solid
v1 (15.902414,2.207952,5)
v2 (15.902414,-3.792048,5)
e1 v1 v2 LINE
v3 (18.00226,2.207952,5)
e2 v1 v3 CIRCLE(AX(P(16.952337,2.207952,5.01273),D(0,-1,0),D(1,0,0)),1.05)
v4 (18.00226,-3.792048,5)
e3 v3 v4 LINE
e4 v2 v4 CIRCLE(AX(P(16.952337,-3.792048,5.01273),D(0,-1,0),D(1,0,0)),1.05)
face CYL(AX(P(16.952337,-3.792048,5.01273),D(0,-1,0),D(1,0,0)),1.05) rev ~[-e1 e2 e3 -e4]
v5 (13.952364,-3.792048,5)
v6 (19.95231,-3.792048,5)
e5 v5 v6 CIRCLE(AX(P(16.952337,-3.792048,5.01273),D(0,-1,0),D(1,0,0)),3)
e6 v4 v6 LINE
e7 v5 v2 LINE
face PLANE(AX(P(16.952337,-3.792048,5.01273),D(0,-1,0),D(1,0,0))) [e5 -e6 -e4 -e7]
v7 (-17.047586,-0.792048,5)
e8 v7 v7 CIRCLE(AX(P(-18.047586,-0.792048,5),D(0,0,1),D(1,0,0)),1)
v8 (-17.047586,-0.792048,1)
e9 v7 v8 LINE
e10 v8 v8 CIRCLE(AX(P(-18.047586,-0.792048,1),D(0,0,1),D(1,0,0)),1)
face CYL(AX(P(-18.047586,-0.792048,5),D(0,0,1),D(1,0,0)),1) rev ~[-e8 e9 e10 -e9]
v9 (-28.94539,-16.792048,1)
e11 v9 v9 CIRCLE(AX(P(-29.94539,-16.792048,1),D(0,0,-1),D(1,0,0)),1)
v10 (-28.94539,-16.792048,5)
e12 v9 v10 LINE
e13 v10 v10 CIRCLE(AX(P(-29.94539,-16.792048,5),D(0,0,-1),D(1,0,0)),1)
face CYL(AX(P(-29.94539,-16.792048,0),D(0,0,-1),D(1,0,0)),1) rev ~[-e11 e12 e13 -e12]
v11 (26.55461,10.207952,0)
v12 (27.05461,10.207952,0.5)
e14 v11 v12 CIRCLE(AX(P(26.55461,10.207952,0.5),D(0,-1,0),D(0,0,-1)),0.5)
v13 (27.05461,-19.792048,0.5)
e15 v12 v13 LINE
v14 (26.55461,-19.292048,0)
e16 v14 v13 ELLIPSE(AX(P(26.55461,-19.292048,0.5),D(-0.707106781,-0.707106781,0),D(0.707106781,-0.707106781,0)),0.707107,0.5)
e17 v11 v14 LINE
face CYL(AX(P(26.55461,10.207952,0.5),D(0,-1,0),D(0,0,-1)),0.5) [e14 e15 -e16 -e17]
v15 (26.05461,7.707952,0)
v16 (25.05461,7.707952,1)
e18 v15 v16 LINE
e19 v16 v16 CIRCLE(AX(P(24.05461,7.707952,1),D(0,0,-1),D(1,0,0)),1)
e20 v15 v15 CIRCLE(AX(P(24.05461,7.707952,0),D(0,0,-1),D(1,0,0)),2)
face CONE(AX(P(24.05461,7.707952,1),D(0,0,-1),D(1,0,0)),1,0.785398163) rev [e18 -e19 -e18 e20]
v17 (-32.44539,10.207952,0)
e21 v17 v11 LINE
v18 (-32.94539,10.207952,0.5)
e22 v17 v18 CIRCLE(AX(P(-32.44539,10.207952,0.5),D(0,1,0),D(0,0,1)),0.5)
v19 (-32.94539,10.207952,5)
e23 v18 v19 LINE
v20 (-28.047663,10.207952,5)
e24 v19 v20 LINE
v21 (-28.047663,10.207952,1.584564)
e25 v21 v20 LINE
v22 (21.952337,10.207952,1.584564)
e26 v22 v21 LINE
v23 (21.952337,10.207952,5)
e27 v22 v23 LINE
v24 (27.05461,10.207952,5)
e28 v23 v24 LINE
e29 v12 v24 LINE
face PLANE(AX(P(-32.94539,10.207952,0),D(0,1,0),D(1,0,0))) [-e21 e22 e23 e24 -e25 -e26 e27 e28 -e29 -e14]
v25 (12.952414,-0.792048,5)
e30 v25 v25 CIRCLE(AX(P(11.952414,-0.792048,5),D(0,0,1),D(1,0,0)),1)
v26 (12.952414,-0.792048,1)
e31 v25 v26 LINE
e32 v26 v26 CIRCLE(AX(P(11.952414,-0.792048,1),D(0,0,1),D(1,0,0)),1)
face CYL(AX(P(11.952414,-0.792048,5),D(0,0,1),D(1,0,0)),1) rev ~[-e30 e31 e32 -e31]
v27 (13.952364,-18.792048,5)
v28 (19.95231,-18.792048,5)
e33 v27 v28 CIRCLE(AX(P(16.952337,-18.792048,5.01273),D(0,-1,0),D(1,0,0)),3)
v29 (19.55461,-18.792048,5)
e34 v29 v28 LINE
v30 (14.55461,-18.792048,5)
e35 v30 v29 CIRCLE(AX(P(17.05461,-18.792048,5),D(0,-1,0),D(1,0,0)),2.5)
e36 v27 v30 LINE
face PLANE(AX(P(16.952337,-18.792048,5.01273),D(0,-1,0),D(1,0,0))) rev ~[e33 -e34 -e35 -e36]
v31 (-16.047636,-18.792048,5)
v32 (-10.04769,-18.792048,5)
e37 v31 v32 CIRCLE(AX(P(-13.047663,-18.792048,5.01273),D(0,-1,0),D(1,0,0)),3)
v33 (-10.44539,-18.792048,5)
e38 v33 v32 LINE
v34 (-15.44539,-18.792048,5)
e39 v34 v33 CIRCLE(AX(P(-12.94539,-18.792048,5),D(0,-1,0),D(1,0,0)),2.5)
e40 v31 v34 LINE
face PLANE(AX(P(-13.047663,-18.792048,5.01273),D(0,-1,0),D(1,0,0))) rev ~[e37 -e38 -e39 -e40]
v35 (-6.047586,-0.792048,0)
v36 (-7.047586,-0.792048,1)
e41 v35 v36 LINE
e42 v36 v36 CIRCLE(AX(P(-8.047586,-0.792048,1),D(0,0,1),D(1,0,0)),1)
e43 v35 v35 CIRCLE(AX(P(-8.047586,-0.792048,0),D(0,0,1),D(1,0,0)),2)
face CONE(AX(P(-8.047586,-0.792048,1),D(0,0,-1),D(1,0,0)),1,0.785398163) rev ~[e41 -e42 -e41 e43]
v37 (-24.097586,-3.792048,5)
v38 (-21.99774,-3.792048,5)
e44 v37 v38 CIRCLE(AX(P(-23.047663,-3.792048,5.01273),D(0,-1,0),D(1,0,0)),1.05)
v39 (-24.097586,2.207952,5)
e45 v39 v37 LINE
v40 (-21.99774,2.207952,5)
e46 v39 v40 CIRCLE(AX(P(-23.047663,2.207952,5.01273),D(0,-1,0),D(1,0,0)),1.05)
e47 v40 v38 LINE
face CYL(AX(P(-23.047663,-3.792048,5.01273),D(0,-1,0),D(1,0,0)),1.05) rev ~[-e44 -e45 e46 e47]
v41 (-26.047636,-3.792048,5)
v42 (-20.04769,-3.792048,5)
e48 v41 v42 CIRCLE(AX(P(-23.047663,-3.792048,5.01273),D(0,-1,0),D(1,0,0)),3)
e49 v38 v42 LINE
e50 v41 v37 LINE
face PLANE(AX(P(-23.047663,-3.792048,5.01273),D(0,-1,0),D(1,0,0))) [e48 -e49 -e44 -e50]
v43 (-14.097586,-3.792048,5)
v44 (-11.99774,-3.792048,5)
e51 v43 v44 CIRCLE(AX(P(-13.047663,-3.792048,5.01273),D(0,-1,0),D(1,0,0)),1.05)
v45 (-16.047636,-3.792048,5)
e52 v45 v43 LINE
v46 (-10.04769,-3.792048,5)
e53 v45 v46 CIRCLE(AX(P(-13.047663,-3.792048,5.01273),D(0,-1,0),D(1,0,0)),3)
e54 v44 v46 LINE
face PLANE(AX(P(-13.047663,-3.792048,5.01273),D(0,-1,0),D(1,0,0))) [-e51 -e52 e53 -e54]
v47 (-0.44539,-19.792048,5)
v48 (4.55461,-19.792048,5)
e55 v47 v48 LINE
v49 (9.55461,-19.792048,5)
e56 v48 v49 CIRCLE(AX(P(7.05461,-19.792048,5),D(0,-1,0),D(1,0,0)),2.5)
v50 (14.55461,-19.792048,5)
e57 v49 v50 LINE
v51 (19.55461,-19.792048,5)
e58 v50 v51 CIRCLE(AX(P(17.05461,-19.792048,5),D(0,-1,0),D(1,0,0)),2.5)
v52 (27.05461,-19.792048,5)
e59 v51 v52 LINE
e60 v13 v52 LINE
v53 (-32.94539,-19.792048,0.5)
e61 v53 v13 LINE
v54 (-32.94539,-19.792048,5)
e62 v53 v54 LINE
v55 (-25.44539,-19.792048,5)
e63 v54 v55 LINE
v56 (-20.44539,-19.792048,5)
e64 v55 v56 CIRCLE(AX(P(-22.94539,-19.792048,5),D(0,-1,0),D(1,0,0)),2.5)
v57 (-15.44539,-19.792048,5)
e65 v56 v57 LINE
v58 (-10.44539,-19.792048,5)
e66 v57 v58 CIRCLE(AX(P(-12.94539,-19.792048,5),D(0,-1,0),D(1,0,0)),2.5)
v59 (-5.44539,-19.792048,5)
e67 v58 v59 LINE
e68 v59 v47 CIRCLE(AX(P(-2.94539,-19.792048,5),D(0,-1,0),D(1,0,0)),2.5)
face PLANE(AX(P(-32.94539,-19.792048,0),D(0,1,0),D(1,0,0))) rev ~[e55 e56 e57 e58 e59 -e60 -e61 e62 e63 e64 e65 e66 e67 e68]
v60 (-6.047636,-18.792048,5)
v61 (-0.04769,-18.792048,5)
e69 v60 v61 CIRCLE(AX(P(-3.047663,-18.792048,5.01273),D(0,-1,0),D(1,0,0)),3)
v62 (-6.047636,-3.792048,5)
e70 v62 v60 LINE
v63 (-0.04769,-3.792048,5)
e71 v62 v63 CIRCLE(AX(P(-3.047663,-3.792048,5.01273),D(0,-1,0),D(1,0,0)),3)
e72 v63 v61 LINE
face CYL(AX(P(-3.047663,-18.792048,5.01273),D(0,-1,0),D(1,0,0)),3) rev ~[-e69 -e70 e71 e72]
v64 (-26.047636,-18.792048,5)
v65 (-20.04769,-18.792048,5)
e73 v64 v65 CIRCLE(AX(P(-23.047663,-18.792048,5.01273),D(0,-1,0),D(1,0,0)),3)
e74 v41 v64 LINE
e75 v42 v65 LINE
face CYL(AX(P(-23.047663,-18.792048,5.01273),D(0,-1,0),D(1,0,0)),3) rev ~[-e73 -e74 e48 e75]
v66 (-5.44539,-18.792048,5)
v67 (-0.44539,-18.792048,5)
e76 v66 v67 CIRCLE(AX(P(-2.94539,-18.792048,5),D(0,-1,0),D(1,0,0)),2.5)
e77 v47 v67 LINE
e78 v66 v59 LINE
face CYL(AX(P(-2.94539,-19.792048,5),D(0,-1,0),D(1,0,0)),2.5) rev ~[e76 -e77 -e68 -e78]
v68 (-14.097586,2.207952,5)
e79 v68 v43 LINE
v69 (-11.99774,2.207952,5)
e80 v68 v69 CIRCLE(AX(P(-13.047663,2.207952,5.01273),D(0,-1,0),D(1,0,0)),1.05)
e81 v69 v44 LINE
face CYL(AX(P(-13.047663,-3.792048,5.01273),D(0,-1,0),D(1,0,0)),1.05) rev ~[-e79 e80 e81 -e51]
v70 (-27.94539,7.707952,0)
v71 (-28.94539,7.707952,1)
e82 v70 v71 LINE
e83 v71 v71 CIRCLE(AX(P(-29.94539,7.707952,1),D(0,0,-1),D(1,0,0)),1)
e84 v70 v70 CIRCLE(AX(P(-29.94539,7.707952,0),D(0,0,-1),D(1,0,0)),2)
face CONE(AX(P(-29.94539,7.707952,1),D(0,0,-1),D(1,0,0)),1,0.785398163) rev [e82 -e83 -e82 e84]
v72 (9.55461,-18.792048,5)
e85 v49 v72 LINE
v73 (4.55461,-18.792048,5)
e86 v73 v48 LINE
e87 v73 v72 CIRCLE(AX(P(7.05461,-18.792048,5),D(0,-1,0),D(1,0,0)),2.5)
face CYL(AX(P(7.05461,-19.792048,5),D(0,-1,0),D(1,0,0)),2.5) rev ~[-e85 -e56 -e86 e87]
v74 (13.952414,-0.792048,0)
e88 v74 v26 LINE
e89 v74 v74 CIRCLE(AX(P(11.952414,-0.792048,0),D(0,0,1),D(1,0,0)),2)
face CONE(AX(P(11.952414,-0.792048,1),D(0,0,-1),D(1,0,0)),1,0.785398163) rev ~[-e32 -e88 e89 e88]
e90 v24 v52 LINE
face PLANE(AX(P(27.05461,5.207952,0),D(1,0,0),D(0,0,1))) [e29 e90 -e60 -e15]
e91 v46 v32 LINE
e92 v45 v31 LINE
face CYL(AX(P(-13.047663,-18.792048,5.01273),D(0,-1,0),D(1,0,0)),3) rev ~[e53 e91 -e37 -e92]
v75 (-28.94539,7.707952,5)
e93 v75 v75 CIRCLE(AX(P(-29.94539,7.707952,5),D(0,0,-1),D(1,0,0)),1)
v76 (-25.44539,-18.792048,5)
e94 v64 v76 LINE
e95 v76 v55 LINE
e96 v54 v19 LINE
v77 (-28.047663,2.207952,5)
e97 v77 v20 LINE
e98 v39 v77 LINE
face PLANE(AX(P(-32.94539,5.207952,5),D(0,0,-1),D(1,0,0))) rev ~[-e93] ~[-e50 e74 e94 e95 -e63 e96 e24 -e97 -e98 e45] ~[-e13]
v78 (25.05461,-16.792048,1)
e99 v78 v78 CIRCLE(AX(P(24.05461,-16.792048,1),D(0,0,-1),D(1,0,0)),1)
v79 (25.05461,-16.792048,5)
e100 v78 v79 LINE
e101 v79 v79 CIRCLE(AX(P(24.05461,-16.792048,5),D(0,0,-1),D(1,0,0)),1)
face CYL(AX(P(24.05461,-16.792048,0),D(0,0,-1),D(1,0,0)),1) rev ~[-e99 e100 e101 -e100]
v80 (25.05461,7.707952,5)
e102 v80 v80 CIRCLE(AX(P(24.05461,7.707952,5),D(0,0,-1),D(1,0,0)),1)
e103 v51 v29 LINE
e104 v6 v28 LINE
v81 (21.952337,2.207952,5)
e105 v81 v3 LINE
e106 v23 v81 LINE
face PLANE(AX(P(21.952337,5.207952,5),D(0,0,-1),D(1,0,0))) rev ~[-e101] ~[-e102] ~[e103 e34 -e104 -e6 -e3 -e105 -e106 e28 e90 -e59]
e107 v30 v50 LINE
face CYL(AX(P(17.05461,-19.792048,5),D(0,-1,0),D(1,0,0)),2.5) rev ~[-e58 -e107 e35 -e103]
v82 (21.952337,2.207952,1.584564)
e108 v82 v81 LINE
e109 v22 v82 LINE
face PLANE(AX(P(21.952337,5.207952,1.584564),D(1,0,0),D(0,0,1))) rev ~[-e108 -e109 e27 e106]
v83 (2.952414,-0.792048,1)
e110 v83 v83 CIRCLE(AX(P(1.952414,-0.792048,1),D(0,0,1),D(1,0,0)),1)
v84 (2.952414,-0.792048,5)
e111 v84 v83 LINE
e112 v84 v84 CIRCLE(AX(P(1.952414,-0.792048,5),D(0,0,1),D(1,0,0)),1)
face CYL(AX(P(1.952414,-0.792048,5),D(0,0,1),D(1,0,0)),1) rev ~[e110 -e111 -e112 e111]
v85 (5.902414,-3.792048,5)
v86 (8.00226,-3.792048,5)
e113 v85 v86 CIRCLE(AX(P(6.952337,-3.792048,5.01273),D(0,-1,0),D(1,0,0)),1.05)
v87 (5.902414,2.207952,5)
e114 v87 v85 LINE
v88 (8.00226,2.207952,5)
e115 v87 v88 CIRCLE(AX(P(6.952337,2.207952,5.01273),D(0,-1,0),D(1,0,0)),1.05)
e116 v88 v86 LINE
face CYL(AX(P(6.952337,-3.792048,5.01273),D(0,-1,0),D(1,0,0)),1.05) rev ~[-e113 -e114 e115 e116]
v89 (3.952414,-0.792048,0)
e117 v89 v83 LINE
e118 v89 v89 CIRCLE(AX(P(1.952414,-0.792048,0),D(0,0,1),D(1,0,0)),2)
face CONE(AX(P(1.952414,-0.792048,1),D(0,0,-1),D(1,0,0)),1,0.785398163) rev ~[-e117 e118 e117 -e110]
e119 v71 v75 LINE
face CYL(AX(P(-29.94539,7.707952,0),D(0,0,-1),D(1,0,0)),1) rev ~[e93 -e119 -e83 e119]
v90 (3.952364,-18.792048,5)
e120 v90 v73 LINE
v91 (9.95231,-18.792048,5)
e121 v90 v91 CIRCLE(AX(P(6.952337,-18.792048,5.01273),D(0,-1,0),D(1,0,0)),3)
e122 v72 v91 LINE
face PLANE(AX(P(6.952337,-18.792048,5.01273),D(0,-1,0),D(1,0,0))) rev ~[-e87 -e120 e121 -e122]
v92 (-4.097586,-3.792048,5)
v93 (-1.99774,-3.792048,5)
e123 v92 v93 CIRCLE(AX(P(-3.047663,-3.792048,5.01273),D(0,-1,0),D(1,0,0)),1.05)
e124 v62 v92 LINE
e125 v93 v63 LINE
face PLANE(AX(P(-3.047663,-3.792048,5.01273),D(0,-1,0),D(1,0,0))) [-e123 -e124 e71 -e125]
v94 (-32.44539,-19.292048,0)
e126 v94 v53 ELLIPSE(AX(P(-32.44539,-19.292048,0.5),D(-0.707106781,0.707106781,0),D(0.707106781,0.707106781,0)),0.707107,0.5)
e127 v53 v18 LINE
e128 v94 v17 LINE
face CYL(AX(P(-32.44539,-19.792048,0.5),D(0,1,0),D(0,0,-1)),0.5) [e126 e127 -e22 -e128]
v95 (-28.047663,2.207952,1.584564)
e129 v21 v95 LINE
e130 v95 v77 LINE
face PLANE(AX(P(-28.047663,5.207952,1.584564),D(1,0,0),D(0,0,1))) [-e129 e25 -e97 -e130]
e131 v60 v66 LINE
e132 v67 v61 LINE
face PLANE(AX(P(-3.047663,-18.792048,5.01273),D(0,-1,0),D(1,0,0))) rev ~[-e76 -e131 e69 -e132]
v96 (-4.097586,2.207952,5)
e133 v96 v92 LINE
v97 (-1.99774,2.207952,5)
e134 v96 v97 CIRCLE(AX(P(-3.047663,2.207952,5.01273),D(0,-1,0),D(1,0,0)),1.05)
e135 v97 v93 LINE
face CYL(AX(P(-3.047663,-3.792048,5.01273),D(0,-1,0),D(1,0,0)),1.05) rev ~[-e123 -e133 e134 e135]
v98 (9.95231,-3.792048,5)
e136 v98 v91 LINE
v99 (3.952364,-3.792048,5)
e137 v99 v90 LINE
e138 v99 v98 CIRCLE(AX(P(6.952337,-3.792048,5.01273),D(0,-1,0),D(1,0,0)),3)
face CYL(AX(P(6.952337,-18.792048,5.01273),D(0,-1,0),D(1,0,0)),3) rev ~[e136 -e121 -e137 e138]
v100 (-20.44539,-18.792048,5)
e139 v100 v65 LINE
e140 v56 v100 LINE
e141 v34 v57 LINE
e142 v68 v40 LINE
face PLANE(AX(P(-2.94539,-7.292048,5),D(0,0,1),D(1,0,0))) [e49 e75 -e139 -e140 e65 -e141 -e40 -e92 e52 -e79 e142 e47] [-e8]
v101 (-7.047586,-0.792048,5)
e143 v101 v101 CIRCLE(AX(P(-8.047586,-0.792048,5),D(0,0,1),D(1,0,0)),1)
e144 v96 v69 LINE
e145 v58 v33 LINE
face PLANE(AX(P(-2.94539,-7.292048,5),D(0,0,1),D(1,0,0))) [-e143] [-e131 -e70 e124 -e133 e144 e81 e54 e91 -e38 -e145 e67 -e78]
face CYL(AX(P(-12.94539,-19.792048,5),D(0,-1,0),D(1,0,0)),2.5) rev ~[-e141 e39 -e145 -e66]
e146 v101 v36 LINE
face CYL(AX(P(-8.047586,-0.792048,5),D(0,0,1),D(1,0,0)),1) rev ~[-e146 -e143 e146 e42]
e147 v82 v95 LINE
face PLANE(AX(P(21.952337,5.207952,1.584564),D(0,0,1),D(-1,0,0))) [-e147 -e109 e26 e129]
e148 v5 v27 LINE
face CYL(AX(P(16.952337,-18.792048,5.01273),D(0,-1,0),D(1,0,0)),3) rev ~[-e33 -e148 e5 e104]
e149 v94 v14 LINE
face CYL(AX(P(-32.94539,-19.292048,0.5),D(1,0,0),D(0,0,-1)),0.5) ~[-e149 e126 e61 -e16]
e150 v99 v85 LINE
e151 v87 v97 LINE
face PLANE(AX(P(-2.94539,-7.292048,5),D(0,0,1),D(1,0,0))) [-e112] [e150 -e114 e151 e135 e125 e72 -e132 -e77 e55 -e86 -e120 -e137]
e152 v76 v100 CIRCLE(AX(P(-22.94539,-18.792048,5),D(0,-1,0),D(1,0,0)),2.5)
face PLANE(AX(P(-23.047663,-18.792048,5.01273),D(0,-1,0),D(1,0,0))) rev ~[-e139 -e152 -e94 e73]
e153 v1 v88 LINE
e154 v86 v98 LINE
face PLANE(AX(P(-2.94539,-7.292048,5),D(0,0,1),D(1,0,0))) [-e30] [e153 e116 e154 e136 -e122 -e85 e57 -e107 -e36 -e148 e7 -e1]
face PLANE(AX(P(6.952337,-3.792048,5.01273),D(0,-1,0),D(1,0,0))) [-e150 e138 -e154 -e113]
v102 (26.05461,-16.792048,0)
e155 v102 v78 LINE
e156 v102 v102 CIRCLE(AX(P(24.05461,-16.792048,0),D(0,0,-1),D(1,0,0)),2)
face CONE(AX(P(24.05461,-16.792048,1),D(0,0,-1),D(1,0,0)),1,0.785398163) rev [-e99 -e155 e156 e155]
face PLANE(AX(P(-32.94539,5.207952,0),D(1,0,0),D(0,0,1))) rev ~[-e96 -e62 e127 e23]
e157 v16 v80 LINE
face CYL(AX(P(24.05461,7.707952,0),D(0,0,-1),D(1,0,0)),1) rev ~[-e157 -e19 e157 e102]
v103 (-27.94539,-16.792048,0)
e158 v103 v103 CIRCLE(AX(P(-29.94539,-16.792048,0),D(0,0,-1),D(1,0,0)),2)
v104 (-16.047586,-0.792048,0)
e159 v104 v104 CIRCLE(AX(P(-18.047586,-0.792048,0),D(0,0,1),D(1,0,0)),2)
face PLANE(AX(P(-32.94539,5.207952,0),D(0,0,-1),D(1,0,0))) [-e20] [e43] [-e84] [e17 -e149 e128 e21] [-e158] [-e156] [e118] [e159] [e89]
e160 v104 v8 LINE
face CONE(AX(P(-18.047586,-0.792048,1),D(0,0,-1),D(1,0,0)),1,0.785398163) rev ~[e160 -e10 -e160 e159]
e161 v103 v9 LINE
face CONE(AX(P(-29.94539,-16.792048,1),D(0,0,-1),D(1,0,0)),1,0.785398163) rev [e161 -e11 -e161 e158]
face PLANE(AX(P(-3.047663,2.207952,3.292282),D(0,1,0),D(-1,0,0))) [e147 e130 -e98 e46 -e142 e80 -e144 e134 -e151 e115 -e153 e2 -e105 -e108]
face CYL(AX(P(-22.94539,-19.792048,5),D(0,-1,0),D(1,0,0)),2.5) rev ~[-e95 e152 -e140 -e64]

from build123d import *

# Parameters (mm, degrees)
F0_W      = 60
F0_H      = 25
F1_DEPTH  = 5
F2_R      = 2.5
F3_DEPTH  = 10
F5_R      = 3
F6_DEPTH  = 15
F7_R      = 1.05
F8_DEPTH  = 29
F9_W      = 50
F9_H      = 3.4154356362
F10_DEPTH = 3
F11_DEPTH = 5
F12_R     = 0.5
F14_R     = 1
F13_R     = 1
F15_DEPTH = 5.001
F16_R     = 1
F17_DEPTH = 5.001
F18_SIZE  = 1


with BuildPart() as f1:
    # F0 (on Top) → F1 (new body)
    with BuildSketch(Plane.XY):
        with Locations((-2.9453901201, -7.2920476746)):
            Rectangle(F0_W, F0_H)
    extrude(amount=F1_DEPTH)

    # F2 (on face) → F3 (cut)
    with BuildSketch(Plane.XZ.offset(19.7920476746)):
        with Locations((-22.9453901201, 5)):
            Circle(F2_R)
        with Locations((-12.9453901201, 5)):
            Circle(F2_R)
        with Locations((-2.9453901201, 5)):
            Circle(F2_R)
        with Locations((7.0546098799, 5)):
            Circle(F2_R)
        with Locations((17.0546098799, 5)):
            Circle(F2_R)
    extrude(amount=-F3_DEPTH, mode=Mode.SUBTRACT)

    # F5 (on offset) → F6 (cut)
    with BuildSketch(Plane.XZ.offset(18.7920476746)):
        with Locations((-23.0476632714, 5.0127296709)):
            Circle(F5_R)
        with Locations((-13.0476632714, 5.0127296709)):
            Circle(F5_R)
        with Locations((-3.0476632714, 5.0127296709)):
            Circle(F5_R)
        with Locations((6.9523367286, 5.0127296709)):
            Circle(F5_R)
        with Locations((16.9523367286, 5.0127296709)):
            Circle(F5_R)
    extrude(amount=-F6_DEPTH, mode=Mode.SUBTRACT)

    # F7 (on face) → F8 (cut)
    with BuildSketch(Plane.XZ.offset(3.7920476746)):
        with Locations((-23.0476632714, 5.0127296709)):
            Circle(F7_R)
        with Locations((-13.0476632714, 5.0127296709)):
            Circle(F7_R)
        with Locations((-3.0476632714, 5.0127296709)):
            Circle(F7_R)
        with Locations((6.9523367286, 5.0127296709)):
            Circle(F7_R)
        with Locations((16.9523367286, 5.0127296709)):
            Circle(F7_R)
    extrude(amount=-F8_DEPTH, mode=Mode.SUBTRACT)

    # F9 (on face) → F10 (cut)
    with BuildSketch(Plane(origin=(0, 5.2079523254, 0), x_dir=(-1, 0, 0), z_dir=(0, 1, 0))):
        with Locations((3.0476632714, 3.2922821819)):
            Rectangle(F9_W, F9_H)
    extrude(amount=-F10_DEPTH, mode=Mode.SUBTRACT)

    # F11 (add): a face of the model
    f11_faces = [f1.faces().sort_by_distance(p)[0] for p in [
        (-2.8102387692, 5.2079523254, 1.4530193808),
    ]]
    extrude(f11_faces, amount=F11_DEPTH)

    # F12
    f12_edges = [f1.edges().sort_by_distance(p)[0] for p in [
        (27.05461, -4.792048, 0),
        (-2.94539, -19.792048, 0),
        (-32.94539, -4.792048, 0),
    ]]
    fillet(f12_edges, radius=F12_R)

    # F14 (on face) + F13 (on face) → F15 (cut, through all)
    with BuildSketch(Plane(origin=(0, 0, 0), x_dir=(1, 0, 0), z_dir=(0, 0, -1))):
        with Locations((-29.9453901201, -7.7079523254)):
            Circle(F14_R)
        with Locations((24.0546098799, -7.7079523254)):
            Circle(F14_R)
    with BuildSketch(Plane(origin=(0, 0, 0), x_dir=(1, 0, 0), z_dir=(0, 0, -1))):
        with Locations((-29.9453901201, 16.7920476746)):
            Circle(F13_R)
        with Locations((24.0546098799, 16.7920476746)):
            Circle(F13_R)
    extrude(amount=-F15_DEPTH, mode=Mode.SUBTRACT)

    # F16 (on face) → F17 (cut, through all)
    with BuildSketch(Plane.XY.offset(5)):
        with Locations((11.9524138955, -0.7920476746)):
            Circle(F16_R)
        with Locations((1.9524138955, -0.7920476746)):
            Circle(F16_R)
        with Locations((-8.0475861045, -0.7920476746)):
            Circle(F16_R)
        with Locations((-18.0475861045, -0.7920476746)):
            Circle(F16_R)
    extrude(amount=-F17_DEPTH, mode=Mode.SUBTRACT)

    # F18
    f18_edges = [f1.edges().sort_by_distance(p)[0] for p in [
        (23.05461, 7.707952, 0),
        (10.952414, -0.792048, 0),
        (23.05461, -16.792048, 0),
        (0.952414, -0.792048, 0),
        (-9.047586, -0.792048, 0),
        (-19.047586, -0.792048, 0),
        (-30.94539, 7.707952, 0),
        (-30.94539, -16.792048, 0),
    ]]
    chamfer(f18_edges, length=F18_SIZE)


solid = f1.part
